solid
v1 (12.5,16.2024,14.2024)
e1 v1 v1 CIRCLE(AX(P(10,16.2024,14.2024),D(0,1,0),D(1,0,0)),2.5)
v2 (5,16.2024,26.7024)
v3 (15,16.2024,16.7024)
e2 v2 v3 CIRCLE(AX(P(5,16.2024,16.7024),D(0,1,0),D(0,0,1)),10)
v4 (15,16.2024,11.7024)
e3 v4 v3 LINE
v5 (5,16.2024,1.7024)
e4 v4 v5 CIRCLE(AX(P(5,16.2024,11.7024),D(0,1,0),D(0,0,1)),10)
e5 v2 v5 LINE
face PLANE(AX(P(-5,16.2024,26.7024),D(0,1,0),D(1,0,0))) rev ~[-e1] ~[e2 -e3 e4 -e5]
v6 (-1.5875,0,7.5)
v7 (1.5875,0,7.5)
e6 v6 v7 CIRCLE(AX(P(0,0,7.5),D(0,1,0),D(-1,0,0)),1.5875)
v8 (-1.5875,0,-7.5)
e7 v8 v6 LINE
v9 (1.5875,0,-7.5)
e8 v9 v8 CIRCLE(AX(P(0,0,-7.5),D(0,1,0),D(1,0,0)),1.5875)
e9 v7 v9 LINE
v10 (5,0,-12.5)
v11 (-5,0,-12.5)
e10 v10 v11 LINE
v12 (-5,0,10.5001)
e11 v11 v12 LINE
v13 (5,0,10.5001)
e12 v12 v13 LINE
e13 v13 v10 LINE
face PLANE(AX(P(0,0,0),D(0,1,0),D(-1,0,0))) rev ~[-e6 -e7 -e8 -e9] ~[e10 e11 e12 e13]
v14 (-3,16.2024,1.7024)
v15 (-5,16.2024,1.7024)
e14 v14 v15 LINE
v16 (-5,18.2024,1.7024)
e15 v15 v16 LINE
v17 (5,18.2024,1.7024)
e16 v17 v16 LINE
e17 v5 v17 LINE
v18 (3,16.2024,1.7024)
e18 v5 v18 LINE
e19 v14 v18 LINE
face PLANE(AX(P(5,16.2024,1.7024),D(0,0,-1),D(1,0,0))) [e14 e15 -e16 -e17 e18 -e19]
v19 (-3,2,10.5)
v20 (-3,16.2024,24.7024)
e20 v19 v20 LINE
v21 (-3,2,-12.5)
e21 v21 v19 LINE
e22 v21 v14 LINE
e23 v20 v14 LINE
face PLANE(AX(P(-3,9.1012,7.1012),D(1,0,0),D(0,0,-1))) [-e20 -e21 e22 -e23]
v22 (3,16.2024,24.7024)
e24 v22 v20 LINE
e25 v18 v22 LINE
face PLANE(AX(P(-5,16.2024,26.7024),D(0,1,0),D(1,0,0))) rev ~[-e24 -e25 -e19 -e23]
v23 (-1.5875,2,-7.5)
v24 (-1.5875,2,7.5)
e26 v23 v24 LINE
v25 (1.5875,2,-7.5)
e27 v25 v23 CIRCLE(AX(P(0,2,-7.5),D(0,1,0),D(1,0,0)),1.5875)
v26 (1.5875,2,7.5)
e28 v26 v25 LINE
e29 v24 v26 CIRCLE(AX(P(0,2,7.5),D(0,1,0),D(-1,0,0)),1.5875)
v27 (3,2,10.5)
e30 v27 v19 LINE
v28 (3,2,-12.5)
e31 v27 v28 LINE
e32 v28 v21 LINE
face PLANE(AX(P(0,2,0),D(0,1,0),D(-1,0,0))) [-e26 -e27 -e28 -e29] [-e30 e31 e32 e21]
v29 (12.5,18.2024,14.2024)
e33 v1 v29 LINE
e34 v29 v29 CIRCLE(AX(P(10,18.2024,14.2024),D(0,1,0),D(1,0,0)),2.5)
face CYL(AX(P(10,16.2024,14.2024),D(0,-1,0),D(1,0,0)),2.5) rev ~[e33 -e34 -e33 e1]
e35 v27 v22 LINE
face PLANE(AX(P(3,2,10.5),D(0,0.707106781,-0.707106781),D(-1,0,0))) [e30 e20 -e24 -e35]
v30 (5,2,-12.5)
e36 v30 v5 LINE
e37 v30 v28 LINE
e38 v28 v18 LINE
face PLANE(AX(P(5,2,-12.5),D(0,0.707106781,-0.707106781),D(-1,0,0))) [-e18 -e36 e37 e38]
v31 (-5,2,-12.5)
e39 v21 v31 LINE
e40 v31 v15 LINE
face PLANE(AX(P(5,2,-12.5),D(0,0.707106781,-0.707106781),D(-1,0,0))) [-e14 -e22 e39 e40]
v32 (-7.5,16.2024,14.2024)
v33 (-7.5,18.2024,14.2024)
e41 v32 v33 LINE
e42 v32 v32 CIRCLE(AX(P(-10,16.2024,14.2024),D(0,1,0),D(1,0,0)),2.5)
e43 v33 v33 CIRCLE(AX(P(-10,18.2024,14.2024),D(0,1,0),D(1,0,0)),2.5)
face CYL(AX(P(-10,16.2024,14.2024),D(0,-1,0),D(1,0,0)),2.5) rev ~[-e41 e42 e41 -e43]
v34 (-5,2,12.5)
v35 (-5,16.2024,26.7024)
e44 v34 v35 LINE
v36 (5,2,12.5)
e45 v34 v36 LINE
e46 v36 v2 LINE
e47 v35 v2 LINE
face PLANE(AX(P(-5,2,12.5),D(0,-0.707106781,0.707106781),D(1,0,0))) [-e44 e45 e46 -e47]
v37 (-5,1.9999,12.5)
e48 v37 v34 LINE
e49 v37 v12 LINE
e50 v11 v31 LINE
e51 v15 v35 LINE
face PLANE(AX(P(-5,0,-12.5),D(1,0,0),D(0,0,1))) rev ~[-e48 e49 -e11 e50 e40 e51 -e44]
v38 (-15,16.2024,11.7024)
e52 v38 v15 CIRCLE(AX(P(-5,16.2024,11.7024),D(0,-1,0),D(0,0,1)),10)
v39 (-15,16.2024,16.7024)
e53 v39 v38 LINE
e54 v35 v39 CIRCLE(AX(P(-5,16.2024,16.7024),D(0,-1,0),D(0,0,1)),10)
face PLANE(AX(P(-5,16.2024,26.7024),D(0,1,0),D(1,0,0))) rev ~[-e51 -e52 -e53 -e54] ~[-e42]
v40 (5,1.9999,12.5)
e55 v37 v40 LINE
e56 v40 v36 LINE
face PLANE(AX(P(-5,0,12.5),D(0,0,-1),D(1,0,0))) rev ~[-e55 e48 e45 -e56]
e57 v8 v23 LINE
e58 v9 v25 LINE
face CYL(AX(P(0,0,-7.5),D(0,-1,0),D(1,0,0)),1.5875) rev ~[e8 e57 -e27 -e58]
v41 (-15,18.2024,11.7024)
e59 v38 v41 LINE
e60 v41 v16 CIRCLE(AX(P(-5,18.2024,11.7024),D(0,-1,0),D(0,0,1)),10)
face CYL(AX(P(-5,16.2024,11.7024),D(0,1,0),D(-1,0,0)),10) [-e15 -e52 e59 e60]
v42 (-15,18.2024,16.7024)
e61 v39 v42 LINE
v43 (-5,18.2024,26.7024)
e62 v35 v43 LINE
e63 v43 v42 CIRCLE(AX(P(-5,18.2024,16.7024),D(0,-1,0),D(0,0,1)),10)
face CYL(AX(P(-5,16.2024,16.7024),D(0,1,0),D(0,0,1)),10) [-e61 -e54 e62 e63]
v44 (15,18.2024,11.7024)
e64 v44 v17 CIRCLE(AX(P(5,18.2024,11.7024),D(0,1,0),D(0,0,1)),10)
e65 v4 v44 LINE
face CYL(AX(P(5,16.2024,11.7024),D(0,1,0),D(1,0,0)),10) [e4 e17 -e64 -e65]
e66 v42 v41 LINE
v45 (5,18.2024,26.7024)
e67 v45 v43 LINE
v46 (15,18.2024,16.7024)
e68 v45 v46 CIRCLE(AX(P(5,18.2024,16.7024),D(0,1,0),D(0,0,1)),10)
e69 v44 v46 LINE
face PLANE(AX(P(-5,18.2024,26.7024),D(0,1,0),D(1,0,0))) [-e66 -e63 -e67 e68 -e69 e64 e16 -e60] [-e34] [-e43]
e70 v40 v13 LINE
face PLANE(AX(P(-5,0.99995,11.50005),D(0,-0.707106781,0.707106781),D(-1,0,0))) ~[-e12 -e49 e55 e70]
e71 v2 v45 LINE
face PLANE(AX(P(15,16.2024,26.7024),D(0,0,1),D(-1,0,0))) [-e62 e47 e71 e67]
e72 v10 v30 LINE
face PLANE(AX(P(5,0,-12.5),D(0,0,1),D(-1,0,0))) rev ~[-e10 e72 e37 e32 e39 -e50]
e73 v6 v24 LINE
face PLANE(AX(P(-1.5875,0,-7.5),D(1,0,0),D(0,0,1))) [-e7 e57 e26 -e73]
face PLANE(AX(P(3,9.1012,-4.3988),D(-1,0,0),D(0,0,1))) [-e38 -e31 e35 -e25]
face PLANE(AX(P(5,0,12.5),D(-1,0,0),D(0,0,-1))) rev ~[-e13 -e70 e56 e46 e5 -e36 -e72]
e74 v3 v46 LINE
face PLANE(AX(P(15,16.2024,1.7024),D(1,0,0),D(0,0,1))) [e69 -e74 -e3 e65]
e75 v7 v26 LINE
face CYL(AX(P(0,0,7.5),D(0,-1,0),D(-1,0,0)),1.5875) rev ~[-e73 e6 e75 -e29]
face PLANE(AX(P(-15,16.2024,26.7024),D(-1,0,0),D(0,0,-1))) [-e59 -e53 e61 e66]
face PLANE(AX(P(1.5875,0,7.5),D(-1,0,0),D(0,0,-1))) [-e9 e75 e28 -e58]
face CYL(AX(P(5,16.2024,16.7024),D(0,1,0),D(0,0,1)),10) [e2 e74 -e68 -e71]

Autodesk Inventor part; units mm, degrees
ref_plane "YZ Plane" through (0, 0, 0) normal (1, 0, 0) x (0, 1, 0)
ref_plane "XZ Plane" through (0, 0, 0) normal (0, 1, 0) x (-1, 0, 0)
ref_plane "XY Plane" through (0, 0, 0) normal (0, 0, 1) x (1, 0, 0)
sketch "Sketch1" plane through (0, 0, 0) normal (0, 1, 0) x (-1, 0, 0)
  line L0 (5, 12.5) -> (-5, 12.5)
  line L1 (-5, 12.5) -> (-5, -12.5)
  line L2 (-5, -12.5) -> (5, -12.5)
  line L3 (5, -12.5) -> (5, 12.5)
  line L4 (5, 12.5) -> (-5, -12.5) construction
  line L5 (-5, 12.5) -> (5, -12.5) construction
  line L6 (0, 7.5) -> (0, -7.5) construction
  line L7 (-1.5875, 7.5) -> (-1.5875, -7.5)
  line L8 (1.5875, -7.5) -> (1.5875, 7.5)
  arc A0 (1.5875, 7.5) -> (-1.5875, 7.5) centre (0, 7.5) ccw
  arc A1 (-1.5875, -7.5) -> (1.5875, -7.5) centre (0, -7.5) ccw
  point P0 (0, 0)
  point P1 (0, 0)
  dimension "d0" = 10
  dimension "d1" = 25
  dimension "d2" = 7.5
  dimension "d3" = 7.5
  dimension "d4" = 3.175
extrude "Extrusion1" add sketch "Sketch1" along normal blind 2
sketch "Sketch2" plane through (0, 2, 0) normal (0, 1, 0) x (1, 0, 0)
  line L0 (5, -12.5) -> (5, 12.5) projected
  line L1 (5, 12.5) -> (-5, 12.5) projected
  line L2 (-5, 12.5) -> (-5, -12.5) projected
  line L3 (-5, -12.5) -> (5, -12.5) projected
  arc A0 (-1.5875, -7.5) -> (1.5875, -7.5) centre (0, -7.5) ccw projected
  line L4 (-1.5875, -7.5) -> (-1.5875, 7.5) projected
  arc A1 (1.5875, 7.5) -> (-1.5875, 7.5) centre (0, 7.5) ccw projected
  line L5 (1.5875, 7.5) -> (1.5875, -7.5) projected
  line L6 (-3, -10.5) -> (-3, 10.5)
  line L7 (3, 10.5) -> (3, -10.5)
  line L8 (3, -10.5) -> (-3, -10.5)
  line L9 (-3, 10.5) -> (-3, 12.5)
  line L10 (3, 10.5) -> (3, 12.5)
  point P0 (0, 0)
  dimension "d7" = 2
sketch "Sketch3" plane through (0, 0, 0) normal (1, 0, 0) x (0, 1, 0)
  line L0 (2, 12.5) -> (16.2024, 26.7024)
  point P0 (0, 0)
  dimension "d15" = 20.0852
sweep "Sweep1" add profiles "Sketch2" path "Sketch3" contours L3 L2 L1 L9 L6 L8 L7 L10 L0
chamfer "Chamfer1" distance 2 angle 45 1 edges at (0, 0, 12.5)
sketch "Sketch5" plane through (-5, 16.2024, 26.7024) normal (0, 1, 0) x (1, 0, 0)
  line L0 (20, 0) -> (-10, 0)
  line L1 (-10, 0) -> (-10, 25)
  line L2 (-10, 25) -> (20, 25)
  line L3 (20, 25) -> (20, 0)
  line L4 (10, 0) -> (10, 25) projected
  circle A0 centre (15, 12.5) radius 2.5
  circle A1 centre (-5, 12.5) radius 2.5
  point P0 (5, 26.7024)
  dimension "d23" = 25
  dimension "d24" = 30
  dimension "d25" = 10
  dimension "d26" = 5
  dimension "d27" = 5
  dimension "d28" = 5
  dimension "d29" = 5
extrude "Extrusion4" add sketch "Sketch5" along normal blind 2
fillet "Fillet1" radius 10 4 edges at (15, 17.2024, 1.7024) (-15, 17.2024, 1.7024) (-15, 17.2024, 26.7024) (15, 17.2024, 26.7024)
properties part number "ancla"
